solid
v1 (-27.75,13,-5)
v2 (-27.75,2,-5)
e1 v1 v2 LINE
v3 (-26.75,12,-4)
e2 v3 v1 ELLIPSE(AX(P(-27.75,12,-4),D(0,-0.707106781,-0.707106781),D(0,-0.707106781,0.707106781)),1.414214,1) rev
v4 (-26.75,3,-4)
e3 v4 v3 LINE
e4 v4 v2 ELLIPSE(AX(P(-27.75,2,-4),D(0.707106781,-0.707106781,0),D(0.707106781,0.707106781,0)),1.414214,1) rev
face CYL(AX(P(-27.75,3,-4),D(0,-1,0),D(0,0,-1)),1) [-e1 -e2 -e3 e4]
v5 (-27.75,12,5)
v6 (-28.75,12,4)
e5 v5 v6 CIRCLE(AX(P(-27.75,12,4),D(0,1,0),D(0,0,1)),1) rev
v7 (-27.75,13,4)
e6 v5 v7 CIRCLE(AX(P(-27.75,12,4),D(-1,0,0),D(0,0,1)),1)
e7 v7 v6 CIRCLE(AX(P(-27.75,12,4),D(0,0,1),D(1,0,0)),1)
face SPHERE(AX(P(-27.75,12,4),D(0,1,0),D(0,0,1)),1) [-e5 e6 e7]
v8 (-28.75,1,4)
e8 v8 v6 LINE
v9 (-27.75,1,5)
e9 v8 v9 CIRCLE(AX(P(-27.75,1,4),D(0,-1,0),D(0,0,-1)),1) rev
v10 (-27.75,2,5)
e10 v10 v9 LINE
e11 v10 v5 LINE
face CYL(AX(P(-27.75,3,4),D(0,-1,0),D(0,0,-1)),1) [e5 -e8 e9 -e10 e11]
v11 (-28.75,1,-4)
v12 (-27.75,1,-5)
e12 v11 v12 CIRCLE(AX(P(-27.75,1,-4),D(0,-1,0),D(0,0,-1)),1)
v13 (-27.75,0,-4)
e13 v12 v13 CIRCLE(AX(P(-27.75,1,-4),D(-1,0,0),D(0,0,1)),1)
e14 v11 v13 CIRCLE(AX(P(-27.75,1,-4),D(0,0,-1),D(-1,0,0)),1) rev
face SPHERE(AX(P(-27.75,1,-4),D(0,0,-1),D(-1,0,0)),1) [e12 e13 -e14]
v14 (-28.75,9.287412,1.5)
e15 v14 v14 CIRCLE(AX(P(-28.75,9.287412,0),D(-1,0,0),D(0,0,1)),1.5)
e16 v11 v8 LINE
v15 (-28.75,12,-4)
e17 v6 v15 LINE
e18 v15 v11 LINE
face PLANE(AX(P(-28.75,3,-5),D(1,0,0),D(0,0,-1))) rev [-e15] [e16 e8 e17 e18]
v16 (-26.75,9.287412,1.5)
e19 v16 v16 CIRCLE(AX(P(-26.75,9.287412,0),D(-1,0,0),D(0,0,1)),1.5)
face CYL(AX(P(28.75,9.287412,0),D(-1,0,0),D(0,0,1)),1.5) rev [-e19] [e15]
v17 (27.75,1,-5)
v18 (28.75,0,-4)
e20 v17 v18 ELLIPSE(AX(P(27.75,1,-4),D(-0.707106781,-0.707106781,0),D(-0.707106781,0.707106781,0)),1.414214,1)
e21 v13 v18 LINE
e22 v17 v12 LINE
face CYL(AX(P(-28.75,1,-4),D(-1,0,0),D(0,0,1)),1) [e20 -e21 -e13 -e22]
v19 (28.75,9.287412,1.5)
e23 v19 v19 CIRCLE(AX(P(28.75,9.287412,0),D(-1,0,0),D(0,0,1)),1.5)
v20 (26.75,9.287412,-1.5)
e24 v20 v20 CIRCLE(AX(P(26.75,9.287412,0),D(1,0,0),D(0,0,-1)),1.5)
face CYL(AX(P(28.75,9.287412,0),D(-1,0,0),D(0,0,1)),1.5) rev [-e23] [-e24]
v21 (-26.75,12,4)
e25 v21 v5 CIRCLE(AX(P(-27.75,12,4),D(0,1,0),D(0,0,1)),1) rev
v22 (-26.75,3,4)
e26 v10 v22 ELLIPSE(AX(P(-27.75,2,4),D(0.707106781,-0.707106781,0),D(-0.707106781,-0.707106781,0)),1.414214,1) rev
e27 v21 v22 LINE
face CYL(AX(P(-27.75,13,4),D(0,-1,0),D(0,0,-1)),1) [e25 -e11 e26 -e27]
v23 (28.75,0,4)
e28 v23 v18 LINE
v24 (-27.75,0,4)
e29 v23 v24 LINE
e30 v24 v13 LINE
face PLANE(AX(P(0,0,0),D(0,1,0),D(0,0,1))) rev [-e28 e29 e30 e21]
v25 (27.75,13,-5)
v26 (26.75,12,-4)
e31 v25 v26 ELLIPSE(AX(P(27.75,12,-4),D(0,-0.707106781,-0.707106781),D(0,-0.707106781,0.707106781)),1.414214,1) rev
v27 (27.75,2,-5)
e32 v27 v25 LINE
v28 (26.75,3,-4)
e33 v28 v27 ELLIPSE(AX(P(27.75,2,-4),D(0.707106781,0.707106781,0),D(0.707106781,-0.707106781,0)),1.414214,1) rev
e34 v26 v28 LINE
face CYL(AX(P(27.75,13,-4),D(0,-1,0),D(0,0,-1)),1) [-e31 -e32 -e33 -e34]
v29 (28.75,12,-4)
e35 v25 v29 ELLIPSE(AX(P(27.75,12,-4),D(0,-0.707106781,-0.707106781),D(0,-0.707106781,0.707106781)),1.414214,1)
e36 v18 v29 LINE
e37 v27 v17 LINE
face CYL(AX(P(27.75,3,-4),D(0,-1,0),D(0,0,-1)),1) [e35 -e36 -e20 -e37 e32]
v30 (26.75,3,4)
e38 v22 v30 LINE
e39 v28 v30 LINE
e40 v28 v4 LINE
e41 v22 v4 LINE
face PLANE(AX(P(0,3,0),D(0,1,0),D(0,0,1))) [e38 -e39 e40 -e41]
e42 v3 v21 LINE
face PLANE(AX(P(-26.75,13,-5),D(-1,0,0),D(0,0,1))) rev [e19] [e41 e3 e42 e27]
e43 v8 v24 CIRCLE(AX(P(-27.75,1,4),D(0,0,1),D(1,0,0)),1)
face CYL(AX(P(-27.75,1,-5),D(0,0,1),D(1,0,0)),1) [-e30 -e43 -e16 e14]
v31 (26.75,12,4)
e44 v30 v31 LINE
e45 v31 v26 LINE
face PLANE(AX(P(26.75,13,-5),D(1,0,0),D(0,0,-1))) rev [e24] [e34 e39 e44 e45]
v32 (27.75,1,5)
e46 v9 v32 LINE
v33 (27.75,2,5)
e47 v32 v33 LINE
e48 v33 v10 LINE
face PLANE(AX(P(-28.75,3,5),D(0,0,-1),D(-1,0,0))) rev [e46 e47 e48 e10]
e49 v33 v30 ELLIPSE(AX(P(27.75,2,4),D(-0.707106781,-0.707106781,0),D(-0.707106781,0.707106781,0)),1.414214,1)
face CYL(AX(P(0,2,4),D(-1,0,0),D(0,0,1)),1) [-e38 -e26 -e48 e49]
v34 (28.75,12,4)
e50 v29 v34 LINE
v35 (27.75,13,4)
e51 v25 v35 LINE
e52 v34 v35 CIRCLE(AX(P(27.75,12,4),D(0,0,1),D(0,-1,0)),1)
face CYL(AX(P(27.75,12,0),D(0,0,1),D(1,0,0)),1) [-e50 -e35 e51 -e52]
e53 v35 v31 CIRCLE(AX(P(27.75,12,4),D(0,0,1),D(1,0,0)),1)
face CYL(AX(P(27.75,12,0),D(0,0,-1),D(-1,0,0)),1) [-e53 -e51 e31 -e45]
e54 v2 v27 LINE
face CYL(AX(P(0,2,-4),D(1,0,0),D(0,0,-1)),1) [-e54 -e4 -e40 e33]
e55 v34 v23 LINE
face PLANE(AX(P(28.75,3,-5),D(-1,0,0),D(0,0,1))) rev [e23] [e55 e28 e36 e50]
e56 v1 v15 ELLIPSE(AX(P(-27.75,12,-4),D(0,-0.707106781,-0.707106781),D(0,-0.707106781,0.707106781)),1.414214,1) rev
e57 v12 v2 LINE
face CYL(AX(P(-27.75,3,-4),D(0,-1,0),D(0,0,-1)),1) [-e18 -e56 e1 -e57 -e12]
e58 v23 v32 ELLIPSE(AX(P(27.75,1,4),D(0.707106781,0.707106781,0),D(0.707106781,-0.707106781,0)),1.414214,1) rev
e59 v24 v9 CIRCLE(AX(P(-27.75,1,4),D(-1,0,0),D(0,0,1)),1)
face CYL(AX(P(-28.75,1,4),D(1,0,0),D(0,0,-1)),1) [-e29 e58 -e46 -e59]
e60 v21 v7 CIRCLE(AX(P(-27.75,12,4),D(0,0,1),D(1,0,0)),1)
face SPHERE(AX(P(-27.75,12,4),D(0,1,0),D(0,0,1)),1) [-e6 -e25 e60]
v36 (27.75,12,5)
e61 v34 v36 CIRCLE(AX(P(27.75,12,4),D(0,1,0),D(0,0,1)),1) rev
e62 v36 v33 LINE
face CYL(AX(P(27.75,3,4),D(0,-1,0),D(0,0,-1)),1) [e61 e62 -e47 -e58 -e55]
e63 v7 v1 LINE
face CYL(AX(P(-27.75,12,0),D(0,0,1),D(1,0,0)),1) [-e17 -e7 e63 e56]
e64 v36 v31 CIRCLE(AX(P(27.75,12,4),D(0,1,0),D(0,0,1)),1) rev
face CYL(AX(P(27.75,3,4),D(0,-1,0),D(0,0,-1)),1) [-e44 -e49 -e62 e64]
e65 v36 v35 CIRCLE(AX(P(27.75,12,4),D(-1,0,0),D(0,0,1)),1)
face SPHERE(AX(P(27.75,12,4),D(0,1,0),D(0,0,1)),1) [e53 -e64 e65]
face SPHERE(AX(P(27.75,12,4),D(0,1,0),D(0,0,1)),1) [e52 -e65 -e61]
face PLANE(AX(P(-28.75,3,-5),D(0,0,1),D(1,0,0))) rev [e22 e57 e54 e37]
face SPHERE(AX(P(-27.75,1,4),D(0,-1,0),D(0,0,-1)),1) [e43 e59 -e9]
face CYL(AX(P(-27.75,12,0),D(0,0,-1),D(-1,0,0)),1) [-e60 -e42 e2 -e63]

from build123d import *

# Parameters (mm, degrees)
SKETCH1_W           = 57.5
SKETCH1_H           = 10
BOSS_EXTRUDE1_DEPTH = 3
SKETCH2_W           = 2
SKETCH2_H           = 10
BOSS_EXTRUDE2_DEPTH = 10
SKETCH3_R           = 1.5
CUT_EXTRUDE1_DEPTH  = 60.162910679
FILLET1_R           = 1


with BuildPart() as part:
    # Sketch1 → Boss-Extrude1 (new body)
    with BuildSketch(Plane(origin=(0, 0, 0), x_dir=(1, 0, 0), z_dir=(0, 1, 0))):
        Rectangle(SKETCH1_W, SKETCH1_H)
    extrude(amount=BOSS_EXTRUDE1_DEPTH)

    # Sketch2 → Boss-Extrude2 (add)
    with BuildSketch(Plane(origin=(0, 3, 0), x_dir=(1, 0, 0), z_dir=(0, 1, 0))):
        with Locations((-27.75, 0)):
            Rectangle(SKETCH2_W, SKETCH2_H)
        with Locations((27.75, 0)):
            Rectangle(SKETCH2_W, SKETCH2_H)
    extrude(amount=BOSS_EXTRUDE2_DEPTH)

    # Sketch3 → Cut-Extrude1 (cut, through all)
    with BuildSketch(Plane.ZY.offset(28.75)):
        with Locations((0, 9.287412426)):
            Circle(SKETCH3_R)
    extrude(amount=-CUT_EXTRUDE1_DEPTH, mode=Mode.SUBTRACT)

    # Fillet1
    fillet1_edges = [part.edges().sort_by_distance(p)[0] for p in [
        (0, 3, 5),
        (-26.75, 8, 5),
        (-26.75, 8, -5),
        (-28.75, 13, 0),
        (-27.75, 13, 5),
        (-26.75, 13, 0),
        (0, 3, -5),
        (26.75, 8, -5),
        (26.75, 8, 5),
        (28.75, 13, 0),
        (26.75, 13, 0),
        (27.75, 13, 5),
        (0, 0, 5),
        (-28.75, 0, 0),
        (0, 0, -5),
        (28.75, 6.5, 5),
        (-28.75, 6.5, 5),
        (-28.75, 6.5, -5),
        (28.75, 6.5, -5),
    ]]
    fillet(fillet1_edges, radius=FILLET1_R - 0.0001)  # a hair under: the kernel refuses the full size


solid = part.part
